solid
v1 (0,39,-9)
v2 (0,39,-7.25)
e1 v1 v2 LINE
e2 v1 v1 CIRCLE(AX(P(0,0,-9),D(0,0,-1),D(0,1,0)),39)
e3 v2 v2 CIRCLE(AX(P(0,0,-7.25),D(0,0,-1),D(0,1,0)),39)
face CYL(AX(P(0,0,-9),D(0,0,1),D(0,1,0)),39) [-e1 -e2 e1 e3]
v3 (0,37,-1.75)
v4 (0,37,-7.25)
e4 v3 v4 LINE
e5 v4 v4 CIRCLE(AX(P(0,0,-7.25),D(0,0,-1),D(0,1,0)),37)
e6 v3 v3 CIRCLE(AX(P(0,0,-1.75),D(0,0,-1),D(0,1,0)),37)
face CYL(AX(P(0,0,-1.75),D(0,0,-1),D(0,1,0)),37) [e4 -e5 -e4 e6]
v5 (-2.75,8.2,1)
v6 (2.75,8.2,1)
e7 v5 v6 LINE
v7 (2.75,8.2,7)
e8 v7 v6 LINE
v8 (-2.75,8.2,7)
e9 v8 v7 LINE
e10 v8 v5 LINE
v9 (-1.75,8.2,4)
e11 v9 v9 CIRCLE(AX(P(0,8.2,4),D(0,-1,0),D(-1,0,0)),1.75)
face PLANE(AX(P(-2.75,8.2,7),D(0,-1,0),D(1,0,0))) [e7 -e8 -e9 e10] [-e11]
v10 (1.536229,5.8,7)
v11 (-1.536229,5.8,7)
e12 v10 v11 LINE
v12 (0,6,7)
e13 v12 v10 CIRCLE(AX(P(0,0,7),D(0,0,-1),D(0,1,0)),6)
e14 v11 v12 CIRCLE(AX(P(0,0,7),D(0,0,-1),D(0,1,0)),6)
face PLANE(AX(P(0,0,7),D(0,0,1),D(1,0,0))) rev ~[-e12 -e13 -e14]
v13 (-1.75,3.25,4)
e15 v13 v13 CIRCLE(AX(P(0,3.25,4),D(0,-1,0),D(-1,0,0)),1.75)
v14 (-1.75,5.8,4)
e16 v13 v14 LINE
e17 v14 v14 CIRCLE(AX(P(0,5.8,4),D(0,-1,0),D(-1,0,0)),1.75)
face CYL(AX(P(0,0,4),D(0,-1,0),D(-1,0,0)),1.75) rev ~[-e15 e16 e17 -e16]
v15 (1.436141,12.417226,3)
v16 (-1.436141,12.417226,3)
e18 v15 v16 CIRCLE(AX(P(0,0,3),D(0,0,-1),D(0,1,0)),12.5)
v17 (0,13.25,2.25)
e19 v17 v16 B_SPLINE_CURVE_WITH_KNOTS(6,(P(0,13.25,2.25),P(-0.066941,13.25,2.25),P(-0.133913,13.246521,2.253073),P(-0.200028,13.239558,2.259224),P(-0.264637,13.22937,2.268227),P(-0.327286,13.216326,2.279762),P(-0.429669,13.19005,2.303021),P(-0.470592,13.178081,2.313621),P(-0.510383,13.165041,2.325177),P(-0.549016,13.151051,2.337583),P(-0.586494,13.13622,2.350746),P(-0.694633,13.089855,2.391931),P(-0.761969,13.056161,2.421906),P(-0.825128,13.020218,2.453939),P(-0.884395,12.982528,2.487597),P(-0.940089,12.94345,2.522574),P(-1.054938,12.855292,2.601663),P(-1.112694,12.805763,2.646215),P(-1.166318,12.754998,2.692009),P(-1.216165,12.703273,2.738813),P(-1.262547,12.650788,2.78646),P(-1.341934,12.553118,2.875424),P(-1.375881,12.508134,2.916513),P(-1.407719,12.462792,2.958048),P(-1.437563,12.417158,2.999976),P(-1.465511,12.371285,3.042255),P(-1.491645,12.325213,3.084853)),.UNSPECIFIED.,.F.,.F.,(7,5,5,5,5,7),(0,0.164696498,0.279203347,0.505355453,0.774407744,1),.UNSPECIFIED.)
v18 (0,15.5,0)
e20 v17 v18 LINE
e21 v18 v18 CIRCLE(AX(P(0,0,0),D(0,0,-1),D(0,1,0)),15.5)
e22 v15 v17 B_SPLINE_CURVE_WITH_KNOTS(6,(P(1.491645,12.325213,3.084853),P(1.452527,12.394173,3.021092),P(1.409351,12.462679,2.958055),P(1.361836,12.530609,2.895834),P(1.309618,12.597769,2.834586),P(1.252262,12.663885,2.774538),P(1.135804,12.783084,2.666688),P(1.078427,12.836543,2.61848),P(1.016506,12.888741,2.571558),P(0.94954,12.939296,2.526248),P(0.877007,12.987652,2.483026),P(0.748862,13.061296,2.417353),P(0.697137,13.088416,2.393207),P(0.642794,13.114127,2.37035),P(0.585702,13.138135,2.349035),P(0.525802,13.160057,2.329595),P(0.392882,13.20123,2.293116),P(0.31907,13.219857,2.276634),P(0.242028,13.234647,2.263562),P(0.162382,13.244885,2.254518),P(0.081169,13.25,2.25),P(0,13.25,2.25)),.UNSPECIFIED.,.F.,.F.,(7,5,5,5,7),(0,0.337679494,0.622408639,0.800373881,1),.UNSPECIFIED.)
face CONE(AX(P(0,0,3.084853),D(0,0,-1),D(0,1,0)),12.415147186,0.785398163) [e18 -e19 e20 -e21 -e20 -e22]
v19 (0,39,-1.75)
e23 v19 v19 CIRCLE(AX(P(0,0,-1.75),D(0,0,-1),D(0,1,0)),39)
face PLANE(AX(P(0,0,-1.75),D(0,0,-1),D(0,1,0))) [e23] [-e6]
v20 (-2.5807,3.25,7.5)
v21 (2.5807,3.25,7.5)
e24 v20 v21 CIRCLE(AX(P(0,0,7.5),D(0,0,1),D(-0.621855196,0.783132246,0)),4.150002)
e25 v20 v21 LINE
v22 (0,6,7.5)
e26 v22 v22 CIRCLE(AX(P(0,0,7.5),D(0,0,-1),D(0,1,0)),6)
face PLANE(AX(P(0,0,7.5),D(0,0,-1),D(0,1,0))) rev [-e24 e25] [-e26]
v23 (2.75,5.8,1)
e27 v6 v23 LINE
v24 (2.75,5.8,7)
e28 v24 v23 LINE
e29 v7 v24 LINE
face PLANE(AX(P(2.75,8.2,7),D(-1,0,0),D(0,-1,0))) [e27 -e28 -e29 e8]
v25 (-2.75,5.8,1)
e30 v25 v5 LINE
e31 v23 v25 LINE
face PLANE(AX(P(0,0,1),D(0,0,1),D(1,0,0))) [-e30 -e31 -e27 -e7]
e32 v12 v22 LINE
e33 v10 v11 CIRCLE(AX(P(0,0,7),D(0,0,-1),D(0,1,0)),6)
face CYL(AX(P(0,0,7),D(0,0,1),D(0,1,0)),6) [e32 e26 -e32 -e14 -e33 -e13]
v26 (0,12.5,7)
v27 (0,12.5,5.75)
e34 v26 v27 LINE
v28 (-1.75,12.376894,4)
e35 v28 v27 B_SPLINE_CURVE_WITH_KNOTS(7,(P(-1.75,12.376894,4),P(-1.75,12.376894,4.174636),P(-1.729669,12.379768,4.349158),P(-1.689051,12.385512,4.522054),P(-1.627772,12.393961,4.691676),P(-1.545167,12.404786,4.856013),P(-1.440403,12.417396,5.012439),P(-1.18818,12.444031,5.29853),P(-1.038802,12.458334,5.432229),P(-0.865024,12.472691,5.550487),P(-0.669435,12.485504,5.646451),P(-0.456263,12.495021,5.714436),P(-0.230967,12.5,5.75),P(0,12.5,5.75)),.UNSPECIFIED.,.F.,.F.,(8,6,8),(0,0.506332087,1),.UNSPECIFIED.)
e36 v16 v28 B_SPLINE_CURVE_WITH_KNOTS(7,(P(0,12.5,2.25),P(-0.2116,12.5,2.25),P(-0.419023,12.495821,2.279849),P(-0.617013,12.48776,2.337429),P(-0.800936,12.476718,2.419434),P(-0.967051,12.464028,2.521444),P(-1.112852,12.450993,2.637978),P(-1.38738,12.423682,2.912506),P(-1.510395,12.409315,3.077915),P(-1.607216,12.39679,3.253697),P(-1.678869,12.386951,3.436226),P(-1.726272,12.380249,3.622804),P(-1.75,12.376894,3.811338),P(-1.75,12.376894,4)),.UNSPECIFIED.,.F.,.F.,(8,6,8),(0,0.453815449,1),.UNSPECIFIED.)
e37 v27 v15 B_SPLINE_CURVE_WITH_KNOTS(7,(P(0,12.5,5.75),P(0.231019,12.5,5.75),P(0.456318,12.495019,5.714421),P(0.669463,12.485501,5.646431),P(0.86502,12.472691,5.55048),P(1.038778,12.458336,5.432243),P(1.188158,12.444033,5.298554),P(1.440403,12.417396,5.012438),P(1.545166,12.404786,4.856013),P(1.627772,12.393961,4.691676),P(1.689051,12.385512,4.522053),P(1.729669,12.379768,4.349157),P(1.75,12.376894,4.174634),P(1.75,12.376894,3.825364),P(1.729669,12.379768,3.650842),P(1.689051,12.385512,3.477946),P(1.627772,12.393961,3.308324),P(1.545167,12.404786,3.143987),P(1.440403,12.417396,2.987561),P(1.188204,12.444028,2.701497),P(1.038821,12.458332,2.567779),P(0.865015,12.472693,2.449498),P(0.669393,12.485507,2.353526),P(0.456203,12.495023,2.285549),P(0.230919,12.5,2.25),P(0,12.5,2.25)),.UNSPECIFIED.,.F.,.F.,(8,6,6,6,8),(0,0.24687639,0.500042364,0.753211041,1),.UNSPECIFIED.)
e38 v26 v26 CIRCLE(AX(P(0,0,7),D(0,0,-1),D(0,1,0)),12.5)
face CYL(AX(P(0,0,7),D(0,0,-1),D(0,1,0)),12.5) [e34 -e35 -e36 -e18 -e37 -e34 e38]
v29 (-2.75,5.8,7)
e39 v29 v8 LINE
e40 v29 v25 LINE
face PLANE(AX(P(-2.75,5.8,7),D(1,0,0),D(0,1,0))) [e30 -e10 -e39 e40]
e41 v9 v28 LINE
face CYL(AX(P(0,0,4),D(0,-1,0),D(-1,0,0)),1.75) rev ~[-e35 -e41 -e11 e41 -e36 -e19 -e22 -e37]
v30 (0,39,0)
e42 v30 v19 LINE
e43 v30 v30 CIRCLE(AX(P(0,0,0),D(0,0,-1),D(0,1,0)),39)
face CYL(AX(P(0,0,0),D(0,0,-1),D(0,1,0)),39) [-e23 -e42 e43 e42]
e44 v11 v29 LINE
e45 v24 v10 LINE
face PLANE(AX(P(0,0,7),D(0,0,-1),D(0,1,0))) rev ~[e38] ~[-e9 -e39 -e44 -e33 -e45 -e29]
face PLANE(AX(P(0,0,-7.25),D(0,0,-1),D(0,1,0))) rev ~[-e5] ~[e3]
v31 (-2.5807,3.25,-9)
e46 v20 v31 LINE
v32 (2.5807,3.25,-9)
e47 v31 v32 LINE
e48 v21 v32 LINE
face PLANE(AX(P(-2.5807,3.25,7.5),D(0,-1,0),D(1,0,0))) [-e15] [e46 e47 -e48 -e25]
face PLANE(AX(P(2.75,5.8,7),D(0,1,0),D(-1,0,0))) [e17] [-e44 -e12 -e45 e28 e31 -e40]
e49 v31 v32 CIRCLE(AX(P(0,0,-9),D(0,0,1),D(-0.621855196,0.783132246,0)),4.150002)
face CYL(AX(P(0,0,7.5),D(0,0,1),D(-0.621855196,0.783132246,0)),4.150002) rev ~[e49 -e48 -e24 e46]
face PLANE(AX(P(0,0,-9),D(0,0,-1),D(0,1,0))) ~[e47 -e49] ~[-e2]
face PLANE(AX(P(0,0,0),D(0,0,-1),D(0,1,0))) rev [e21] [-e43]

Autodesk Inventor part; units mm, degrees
ref_plane "YZ Plane" through (0, 0, 0) normal (1, 0, 0) x (0, 1, 0)
ref_plane "XZ Plane" through (0, 0, 0) normal (0, 1, 0) x (-1, 0, 0)
ref_plane "XY Plane" through (0, 0, 0) normal (0, 0, 1) x (1, 0, 0)
sketch "Esquisse1" plane through (0, 0, 0) normal (1, 0, 0) x (0, 1, 0)
  line L0 (37, -9) -> (37, 0) construction
  line L1 (0, 7.5) -> (6, 7.5)
  line L2 (12.5, 7) -> (12.5, 0)
  line L3 (0, 7.5) -> (0, -9)
  line L4 (0, 31.5501) -> (0, -31.5501)
  line L5 (37, -4.5) -> (0, -4.5) construction
  line L6 (12.5, 0) -> (39, 0)
  line L7 (39, 0) -> (39, -1.75)
  line L8 (39, -1.75) -> (37, -1.75)
  line L9 (37, -1.75) -> (37, -7.25)
  line L10 (0, -9) -> (39, -9)
  line L11 (39, -9) -> (39, -7.25)
  line L12 (39, -7.25) -> (37, -7.25)
  line L13 (12.5, 7) -> (6, 7)
  line L14 (6, 7) -> (6, 7.5)
  point P0 (0, 0)
  point P1 (6, 7.25)
  dimension "d1" = 9
  dimension "d4" = 0
  dimension "d5" = 74
  dimension "d6" = 25
  dimension "d20" = 2
  dimension "d21" = 2.75
  dimension "d31" = 16.5
  dimension "d32" = 6
  dimension "d33" = 0.5
revolve "Révolution1" add sketch "Esquisse1" angle 360 about axis through (0, 0, 31.5501) along (0, 0, -1)
sketch "Esquisse2" plane through (0, 0, 0) normal (0, 1, 0) x (-1, 0, 0)
  circle A0 centre (0, 4) radius 1.75
  line L0 (-12.5, 7) -> (12.5, 7) projected
  point P0 (0, 0)
  dimension "d11" = 3.5
  dimension "d12" = 3
extrude "Extrusion1" cut sketch "Esquisse2" along normal through all
sketch "Esquisse3" plane through (0, 0, 7) normal (0, 0, 1) x (1, 0, 0)
  line L0 (-2.75, 8.2) -> (2.75, 8.2)
  line L1 (2.75, 8.2) -> (2.75, 5.8)
  line L2 (2.75, 5.8) -> (-2.75, 5.8)
  line L3 (-2.75, 5.8) -> (-2.75, 8.2)
  line L4 (-2.75, 8.2) -> (2.75, 5.8) construction
  line L5 (2.75, 8.2) -> (-2.75, 5.8) construction
  line L6 (0, 7) -> (0, 0) construction
  point P0 (0, 0)
  dimension "d15" = 5.5
  dimension "d16" = 2.4
  dimension "d17" = 7
extrude "Extrusion2" cut sketch "Esquisse3" against normal blind 6
chamfer "Chanfrein1" distance 3 angle 45 1 edges at (0, -12.5, 0)
sketch "Esquisse4" plane through (0, 0, 7.5) normal (0, 0, 1) x (1, 0, 0)
  arc A0 (-2.5807, 3.25) -> (2.5807, 3.25) centre (0, 0) ccw
  line L0 (-2.5807, 3.25) -> (2.5807, 3.25)
  point P0 (0, 0)
  dimension "d27" = 8.3
  dimension "d28" = 3.25
extrude "Extrusion3" cut sketch "Esquisse4" against normal through all
properties part number "roue"
